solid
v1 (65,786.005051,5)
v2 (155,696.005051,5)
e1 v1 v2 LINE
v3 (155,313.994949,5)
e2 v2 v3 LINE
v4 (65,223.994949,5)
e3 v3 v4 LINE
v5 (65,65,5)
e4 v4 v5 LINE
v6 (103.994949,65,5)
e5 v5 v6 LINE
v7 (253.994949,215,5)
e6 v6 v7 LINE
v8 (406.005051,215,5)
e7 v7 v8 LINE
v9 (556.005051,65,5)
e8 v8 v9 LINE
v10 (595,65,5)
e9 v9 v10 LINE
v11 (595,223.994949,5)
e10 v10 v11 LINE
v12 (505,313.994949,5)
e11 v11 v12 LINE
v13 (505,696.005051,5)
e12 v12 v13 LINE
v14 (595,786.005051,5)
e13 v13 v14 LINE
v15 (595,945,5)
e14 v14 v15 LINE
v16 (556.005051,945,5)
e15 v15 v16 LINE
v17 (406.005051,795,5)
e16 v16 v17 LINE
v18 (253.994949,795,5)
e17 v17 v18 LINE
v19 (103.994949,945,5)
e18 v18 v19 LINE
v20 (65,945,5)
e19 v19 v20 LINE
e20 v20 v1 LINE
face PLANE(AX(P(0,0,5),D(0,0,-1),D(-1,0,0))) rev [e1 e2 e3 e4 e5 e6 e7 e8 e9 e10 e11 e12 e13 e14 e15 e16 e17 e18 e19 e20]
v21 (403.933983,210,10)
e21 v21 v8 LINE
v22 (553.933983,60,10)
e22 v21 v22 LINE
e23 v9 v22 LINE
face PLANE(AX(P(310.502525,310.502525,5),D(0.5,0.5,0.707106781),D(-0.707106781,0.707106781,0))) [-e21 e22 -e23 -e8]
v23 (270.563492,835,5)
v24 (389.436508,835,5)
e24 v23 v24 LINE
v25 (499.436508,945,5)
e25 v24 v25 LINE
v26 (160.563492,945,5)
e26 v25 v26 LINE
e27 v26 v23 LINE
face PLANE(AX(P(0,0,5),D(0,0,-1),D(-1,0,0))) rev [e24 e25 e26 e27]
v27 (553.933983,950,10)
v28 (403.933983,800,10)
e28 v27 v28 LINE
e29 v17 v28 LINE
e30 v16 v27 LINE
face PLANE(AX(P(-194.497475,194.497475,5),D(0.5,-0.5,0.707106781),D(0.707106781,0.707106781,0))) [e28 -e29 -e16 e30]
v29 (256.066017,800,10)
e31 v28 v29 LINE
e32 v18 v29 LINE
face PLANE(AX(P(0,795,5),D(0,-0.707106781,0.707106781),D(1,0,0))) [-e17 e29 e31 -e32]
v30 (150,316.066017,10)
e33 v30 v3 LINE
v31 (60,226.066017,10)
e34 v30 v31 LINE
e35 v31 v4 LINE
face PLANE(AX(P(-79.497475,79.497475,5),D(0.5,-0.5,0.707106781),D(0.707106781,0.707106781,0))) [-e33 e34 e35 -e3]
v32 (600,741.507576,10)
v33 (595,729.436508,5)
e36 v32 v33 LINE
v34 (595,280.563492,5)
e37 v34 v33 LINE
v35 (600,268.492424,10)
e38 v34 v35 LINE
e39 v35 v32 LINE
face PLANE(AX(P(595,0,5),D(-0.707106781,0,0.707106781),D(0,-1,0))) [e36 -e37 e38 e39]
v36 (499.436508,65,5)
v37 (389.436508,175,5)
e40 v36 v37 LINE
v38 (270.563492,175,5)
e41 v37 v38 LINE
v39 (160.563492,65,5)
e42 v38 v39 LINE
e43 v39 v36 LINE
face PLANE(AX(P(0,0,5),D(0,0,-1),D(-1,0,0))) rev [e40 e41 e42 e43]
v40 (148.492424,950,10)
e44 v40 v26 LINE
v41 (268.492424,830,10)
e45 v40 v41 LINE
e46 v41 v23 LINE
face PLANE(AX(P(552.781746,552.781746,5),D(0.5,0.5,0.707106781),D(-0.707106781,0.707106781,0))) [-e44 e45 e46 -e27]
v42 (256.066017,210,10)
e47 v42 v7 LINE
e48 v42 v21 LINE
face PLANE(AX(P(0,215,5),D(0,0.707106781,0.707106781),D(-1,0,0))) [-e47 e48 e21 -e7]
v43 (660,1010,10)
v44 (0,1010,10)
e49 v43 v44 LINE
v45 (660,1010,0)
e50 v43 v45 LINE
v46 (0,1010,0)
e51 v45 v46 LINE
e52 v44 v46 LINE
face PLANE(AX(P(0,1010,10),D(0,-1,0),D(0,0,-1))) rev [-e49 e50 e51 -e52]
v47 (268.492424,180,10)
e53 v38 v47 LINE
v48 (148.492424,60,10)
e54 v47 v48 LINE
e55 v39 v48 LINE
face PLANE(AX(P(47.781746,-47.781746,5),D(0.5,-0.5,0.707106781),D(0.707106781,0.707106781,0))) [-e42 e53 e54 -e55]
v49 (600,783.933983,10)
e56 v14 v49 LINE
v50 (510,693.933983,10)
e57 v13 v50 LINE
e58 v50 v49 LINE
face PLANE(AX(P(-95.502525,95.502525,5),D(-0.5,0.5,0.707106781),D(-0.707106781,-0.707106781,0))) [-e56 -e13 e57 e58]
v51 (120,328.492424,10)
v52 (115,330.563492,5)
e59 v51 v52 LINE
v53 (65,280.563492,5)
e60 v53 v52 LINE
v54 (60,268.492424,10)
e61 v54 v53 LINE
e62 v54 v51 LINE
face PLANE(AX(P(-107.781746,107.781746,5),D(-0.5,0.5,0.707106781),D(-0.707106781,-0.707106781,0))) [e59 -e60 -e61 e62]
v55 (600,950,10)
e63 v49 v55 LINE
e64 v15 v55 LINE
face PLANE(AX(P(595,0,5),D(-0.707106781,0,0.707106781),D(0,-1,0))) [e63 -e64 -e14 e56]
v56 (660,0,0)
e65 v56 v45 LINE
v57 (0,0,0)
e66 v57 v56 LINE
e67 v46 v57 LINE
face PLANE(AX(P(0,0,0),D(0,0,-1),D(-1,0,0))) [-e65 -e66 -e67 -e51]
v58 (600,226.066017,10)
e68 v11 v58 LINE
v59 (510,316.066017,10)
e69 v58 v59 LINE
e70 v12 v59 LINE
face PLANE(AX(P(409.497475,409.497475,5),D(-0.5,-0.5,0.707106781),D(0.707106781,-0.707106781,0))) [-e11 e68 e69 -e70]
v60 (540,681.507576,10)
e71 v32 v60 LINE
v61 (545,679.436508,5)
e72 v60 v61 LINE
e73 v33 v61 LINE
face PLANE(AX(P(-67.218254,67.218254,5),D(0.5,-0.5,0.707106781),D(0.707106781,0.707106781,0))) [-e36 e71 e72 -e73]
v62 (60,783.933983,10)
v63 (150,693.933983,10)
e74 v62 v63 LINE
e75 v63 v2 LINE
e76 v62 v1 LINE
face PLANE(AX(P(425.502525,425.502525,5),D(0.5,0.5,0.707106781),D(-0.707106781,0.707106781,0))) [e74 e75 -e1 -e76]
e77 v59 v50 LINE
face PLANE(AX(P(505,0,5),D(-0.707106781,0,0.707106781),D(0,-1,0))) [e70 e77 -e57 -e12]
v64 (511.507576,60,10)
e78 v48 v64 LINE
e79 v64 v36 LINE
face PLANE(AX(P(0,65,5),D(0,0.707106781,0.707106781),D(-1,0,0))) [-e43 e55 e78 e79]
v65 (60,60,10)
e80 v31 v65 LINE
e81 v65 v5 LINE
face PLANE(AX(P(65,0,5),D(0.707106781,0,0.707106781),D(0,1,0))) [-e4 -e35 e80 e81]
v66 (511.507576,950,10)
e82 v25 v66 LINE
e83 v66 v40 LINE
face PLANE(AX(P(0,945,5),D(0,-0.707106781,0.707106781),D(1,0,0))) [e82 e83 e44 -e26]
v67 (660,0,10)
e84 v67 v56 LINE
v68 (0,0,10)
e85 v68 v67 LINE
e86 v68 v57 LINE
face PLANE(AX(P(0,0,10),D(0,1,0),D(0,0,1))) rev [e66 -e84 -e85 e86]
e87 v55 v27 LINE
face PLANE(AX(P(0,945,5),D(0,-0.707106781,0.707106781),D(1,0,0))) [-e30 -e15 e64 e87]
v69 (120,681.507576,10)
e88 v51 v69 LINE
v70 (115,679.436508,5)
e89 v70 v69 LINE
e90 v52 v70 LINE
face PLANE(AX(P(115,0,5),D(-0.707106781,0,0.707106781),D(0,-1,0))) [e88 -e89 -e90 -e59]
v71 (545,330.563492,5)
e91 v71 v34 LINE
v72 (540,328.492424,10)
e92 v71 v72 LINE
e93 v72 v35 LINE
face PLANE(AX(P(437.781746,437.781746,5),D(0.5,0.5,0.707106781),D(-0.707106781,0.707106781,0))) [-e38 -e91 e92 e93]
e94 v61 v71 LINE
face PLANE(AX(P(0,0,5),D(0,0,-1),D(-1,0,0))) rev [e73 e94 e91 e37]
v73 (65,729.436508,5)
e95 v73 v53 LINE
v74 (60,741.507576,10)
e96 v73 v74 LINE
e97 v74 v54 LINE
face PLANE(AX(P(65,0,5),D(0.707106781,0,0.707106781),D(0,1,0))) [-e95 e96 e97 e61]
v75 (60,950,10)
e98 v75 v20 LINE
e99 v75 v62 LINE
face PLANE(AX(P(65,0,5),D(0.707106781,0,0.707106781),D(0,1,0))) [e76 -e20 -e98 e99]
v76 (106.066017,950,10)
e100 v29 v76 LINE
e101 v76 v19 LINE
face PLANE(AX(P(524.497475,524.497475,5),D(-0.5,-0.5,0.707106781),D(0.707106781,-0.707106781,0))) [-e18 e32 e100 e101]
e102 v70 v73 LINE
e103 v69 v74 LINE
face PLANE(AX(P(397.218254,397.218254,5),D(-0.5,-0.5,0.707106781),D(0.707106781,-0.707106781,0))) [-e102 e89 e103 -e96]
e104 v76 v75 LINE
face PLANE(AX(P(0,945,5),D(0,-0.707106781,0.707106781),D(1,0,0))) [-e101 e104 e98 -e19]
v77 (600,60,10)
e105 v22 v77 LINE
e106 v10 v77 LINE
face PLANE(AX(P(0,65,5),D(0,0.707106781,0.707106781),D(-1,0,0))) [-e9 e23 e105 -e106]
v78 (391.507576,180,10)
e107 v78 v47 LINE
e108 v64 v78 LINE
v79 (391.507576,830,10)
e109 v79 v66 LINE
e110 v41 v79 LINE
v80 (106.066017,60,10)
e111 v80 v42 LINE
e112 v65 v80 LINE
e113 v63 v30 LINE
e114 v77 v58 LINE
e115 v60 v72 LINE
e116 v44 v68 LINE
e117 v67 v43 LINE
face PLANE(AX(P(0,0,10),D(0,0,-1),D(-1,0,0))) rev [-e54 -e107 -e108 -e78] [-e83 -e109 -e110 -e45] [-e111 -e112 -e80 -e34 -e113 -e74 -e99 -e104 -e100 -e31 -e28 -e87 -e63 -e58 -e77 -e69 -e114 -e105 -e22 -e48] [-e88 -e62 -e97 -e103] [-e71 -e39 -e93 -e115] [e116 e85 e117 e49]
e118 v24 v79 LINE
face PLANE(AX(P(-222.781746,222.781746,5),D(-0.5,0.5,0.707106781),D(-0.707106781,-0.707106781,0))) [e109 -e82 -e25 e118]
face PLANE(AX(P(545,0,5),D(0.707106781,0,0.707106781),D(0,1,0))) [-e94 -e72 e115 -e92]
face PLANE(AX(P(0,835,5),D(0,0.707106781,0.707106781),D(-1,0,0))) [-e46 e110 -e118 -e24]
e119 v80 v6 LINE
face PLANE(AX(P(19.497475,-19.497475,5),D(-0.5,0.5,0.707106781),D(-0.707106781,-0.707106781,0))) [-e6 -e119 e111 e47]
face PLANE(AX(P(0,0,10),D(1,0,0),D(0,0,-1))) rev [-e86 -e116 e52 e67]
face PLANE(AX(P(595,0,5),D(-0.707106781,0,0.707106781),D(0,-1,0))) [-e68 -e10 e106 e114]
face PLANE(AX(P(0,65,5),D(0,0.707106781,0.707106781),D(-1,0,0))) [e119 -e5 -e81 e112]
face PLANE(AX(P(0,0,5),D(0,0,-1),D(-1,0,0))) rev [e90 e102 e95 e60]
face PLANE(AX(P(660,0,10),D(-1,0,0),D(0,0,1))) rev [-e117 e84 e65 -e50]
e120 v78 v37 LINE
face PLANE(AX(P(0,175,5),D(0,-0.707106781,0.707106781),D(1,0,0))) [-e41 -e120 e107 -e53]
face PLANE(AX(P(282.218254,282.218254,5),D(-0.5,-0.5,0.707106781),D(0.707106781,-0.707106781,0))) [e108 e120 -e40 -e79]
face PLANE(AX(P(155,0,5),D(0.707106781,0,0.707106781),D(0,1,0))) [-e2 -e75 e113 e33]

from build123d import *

# Parameters (mm, degrees)
ESQUISSE1_W             = 660
ESQUISSE1_H             = 1010
BOSS_EXTRU_1_DEPTH      = 10
ENL_V_MAT_EXTRU_1_DEPTH = 5
CHANFREIN1_SIZE         = 5


with BuildPart() as part:
    # Esquisse1 → Boss.-Extru.1 (new body)
    with BuildSketch(Plane.XY):
        with Locations((330, 505)):
            Rectangle(ESQUISSE1_W, ESQUISSE1_H)
    extrude(amount=BOSS_EXTRU_1_DEPTH)

    # Esquisse2 → Enlèv. mat.-Extru.1 (cut)
    with BuildSketch(Plane.XY.offset(10)):
        Polygon((120, 328.492424049), (120, 681.507575951), (60, 741.507575951), (60, 268.492424049), align=None)
        Polygon((268.492424049, 830), (391.507575951, 830), (511.507575951, 950), (148.492424049, 950), align=None)
        Polygon((60, 950), (60, 783.933982822), (150, 693.933982822), (150, 316.066017178), (60, 226.066017178), (60, 60), (106.066017178, 60), (256.066017178, 210), (403.933982822, 210), (553.933982822, 60), (600, 60), (600, 226.066017178), (510, 316.066017178), (510, 693.933982822), (600, 783.933982822), (600, 950), (553.933982822, 950), (403.933982822, 800), (256.066017178, 800), (106.066017178, 950), align=None)
        Polygon((540, 328.492424049), (540, 681.507575951), (600, 741.507575951), (600, 268.492424049), align=None)
        Polygon((511.507575951, 60), (148.492424049, 60), (268.492424049, 180), (391.507575951, 180), align=None)
    extrude(amount=-ENL_V_MAT_EXTRU_1_DEPTH, mode=Mode.SUBTRACT)

    # Chanfrein1
    chanfrein1_edges = [part.edges().sort_by_distance(p)[0] for p in [
        (330, 60, 5),
        (208.492424049, 120, 5),
        (330, 180, 5),
        (451.507575951, 120, 5),
        (60, 505, 5),
        (90, 711.507575951, 5),
        (120, 505, 5),
        (90, 298.492424049, 5),
        (600, 505, 5),
        (570, 298.492424049, 5),
        (540, 505, 5),
        (570, 711.507575951, 5),
        (181.066017178, 875, 5),
        (330, 800, 5),
        (478.933982822, 875, 5),
        (576.966991411, 950, 5),
        (600, 866.966991411, 5),
        (555, 738.933982822, 5),
        (510, 505, 5),
        (555, 271.066017178, 5),
        (600, 143.033008589, 5),
        (576.966991411, 60, 5),
        (478.933982822, 135, 5),
        (330, 210, 5),
        (181.066017178, 135, 5),
        (83.033008589, 60, 5),
        (60, 143.033008589, 5),
        (105, 271.066017178, 5),
        (150, 505, 5),
        (105, 738.933982822, 5),
        (60, 866.966991411, 5),
        (83.033008589, 950, 5),
        (330, 950, 5),
        (451.507575951, 890, 5),
        (330, 830, 5),
        (208.492424049, 890, 5),
    ]]
    chamfer(chanfrein1_edges, length=CHANFREIN1_SIZE - 0.0001)  # a hair under: the kernel refuses the full size


solid = part.part
